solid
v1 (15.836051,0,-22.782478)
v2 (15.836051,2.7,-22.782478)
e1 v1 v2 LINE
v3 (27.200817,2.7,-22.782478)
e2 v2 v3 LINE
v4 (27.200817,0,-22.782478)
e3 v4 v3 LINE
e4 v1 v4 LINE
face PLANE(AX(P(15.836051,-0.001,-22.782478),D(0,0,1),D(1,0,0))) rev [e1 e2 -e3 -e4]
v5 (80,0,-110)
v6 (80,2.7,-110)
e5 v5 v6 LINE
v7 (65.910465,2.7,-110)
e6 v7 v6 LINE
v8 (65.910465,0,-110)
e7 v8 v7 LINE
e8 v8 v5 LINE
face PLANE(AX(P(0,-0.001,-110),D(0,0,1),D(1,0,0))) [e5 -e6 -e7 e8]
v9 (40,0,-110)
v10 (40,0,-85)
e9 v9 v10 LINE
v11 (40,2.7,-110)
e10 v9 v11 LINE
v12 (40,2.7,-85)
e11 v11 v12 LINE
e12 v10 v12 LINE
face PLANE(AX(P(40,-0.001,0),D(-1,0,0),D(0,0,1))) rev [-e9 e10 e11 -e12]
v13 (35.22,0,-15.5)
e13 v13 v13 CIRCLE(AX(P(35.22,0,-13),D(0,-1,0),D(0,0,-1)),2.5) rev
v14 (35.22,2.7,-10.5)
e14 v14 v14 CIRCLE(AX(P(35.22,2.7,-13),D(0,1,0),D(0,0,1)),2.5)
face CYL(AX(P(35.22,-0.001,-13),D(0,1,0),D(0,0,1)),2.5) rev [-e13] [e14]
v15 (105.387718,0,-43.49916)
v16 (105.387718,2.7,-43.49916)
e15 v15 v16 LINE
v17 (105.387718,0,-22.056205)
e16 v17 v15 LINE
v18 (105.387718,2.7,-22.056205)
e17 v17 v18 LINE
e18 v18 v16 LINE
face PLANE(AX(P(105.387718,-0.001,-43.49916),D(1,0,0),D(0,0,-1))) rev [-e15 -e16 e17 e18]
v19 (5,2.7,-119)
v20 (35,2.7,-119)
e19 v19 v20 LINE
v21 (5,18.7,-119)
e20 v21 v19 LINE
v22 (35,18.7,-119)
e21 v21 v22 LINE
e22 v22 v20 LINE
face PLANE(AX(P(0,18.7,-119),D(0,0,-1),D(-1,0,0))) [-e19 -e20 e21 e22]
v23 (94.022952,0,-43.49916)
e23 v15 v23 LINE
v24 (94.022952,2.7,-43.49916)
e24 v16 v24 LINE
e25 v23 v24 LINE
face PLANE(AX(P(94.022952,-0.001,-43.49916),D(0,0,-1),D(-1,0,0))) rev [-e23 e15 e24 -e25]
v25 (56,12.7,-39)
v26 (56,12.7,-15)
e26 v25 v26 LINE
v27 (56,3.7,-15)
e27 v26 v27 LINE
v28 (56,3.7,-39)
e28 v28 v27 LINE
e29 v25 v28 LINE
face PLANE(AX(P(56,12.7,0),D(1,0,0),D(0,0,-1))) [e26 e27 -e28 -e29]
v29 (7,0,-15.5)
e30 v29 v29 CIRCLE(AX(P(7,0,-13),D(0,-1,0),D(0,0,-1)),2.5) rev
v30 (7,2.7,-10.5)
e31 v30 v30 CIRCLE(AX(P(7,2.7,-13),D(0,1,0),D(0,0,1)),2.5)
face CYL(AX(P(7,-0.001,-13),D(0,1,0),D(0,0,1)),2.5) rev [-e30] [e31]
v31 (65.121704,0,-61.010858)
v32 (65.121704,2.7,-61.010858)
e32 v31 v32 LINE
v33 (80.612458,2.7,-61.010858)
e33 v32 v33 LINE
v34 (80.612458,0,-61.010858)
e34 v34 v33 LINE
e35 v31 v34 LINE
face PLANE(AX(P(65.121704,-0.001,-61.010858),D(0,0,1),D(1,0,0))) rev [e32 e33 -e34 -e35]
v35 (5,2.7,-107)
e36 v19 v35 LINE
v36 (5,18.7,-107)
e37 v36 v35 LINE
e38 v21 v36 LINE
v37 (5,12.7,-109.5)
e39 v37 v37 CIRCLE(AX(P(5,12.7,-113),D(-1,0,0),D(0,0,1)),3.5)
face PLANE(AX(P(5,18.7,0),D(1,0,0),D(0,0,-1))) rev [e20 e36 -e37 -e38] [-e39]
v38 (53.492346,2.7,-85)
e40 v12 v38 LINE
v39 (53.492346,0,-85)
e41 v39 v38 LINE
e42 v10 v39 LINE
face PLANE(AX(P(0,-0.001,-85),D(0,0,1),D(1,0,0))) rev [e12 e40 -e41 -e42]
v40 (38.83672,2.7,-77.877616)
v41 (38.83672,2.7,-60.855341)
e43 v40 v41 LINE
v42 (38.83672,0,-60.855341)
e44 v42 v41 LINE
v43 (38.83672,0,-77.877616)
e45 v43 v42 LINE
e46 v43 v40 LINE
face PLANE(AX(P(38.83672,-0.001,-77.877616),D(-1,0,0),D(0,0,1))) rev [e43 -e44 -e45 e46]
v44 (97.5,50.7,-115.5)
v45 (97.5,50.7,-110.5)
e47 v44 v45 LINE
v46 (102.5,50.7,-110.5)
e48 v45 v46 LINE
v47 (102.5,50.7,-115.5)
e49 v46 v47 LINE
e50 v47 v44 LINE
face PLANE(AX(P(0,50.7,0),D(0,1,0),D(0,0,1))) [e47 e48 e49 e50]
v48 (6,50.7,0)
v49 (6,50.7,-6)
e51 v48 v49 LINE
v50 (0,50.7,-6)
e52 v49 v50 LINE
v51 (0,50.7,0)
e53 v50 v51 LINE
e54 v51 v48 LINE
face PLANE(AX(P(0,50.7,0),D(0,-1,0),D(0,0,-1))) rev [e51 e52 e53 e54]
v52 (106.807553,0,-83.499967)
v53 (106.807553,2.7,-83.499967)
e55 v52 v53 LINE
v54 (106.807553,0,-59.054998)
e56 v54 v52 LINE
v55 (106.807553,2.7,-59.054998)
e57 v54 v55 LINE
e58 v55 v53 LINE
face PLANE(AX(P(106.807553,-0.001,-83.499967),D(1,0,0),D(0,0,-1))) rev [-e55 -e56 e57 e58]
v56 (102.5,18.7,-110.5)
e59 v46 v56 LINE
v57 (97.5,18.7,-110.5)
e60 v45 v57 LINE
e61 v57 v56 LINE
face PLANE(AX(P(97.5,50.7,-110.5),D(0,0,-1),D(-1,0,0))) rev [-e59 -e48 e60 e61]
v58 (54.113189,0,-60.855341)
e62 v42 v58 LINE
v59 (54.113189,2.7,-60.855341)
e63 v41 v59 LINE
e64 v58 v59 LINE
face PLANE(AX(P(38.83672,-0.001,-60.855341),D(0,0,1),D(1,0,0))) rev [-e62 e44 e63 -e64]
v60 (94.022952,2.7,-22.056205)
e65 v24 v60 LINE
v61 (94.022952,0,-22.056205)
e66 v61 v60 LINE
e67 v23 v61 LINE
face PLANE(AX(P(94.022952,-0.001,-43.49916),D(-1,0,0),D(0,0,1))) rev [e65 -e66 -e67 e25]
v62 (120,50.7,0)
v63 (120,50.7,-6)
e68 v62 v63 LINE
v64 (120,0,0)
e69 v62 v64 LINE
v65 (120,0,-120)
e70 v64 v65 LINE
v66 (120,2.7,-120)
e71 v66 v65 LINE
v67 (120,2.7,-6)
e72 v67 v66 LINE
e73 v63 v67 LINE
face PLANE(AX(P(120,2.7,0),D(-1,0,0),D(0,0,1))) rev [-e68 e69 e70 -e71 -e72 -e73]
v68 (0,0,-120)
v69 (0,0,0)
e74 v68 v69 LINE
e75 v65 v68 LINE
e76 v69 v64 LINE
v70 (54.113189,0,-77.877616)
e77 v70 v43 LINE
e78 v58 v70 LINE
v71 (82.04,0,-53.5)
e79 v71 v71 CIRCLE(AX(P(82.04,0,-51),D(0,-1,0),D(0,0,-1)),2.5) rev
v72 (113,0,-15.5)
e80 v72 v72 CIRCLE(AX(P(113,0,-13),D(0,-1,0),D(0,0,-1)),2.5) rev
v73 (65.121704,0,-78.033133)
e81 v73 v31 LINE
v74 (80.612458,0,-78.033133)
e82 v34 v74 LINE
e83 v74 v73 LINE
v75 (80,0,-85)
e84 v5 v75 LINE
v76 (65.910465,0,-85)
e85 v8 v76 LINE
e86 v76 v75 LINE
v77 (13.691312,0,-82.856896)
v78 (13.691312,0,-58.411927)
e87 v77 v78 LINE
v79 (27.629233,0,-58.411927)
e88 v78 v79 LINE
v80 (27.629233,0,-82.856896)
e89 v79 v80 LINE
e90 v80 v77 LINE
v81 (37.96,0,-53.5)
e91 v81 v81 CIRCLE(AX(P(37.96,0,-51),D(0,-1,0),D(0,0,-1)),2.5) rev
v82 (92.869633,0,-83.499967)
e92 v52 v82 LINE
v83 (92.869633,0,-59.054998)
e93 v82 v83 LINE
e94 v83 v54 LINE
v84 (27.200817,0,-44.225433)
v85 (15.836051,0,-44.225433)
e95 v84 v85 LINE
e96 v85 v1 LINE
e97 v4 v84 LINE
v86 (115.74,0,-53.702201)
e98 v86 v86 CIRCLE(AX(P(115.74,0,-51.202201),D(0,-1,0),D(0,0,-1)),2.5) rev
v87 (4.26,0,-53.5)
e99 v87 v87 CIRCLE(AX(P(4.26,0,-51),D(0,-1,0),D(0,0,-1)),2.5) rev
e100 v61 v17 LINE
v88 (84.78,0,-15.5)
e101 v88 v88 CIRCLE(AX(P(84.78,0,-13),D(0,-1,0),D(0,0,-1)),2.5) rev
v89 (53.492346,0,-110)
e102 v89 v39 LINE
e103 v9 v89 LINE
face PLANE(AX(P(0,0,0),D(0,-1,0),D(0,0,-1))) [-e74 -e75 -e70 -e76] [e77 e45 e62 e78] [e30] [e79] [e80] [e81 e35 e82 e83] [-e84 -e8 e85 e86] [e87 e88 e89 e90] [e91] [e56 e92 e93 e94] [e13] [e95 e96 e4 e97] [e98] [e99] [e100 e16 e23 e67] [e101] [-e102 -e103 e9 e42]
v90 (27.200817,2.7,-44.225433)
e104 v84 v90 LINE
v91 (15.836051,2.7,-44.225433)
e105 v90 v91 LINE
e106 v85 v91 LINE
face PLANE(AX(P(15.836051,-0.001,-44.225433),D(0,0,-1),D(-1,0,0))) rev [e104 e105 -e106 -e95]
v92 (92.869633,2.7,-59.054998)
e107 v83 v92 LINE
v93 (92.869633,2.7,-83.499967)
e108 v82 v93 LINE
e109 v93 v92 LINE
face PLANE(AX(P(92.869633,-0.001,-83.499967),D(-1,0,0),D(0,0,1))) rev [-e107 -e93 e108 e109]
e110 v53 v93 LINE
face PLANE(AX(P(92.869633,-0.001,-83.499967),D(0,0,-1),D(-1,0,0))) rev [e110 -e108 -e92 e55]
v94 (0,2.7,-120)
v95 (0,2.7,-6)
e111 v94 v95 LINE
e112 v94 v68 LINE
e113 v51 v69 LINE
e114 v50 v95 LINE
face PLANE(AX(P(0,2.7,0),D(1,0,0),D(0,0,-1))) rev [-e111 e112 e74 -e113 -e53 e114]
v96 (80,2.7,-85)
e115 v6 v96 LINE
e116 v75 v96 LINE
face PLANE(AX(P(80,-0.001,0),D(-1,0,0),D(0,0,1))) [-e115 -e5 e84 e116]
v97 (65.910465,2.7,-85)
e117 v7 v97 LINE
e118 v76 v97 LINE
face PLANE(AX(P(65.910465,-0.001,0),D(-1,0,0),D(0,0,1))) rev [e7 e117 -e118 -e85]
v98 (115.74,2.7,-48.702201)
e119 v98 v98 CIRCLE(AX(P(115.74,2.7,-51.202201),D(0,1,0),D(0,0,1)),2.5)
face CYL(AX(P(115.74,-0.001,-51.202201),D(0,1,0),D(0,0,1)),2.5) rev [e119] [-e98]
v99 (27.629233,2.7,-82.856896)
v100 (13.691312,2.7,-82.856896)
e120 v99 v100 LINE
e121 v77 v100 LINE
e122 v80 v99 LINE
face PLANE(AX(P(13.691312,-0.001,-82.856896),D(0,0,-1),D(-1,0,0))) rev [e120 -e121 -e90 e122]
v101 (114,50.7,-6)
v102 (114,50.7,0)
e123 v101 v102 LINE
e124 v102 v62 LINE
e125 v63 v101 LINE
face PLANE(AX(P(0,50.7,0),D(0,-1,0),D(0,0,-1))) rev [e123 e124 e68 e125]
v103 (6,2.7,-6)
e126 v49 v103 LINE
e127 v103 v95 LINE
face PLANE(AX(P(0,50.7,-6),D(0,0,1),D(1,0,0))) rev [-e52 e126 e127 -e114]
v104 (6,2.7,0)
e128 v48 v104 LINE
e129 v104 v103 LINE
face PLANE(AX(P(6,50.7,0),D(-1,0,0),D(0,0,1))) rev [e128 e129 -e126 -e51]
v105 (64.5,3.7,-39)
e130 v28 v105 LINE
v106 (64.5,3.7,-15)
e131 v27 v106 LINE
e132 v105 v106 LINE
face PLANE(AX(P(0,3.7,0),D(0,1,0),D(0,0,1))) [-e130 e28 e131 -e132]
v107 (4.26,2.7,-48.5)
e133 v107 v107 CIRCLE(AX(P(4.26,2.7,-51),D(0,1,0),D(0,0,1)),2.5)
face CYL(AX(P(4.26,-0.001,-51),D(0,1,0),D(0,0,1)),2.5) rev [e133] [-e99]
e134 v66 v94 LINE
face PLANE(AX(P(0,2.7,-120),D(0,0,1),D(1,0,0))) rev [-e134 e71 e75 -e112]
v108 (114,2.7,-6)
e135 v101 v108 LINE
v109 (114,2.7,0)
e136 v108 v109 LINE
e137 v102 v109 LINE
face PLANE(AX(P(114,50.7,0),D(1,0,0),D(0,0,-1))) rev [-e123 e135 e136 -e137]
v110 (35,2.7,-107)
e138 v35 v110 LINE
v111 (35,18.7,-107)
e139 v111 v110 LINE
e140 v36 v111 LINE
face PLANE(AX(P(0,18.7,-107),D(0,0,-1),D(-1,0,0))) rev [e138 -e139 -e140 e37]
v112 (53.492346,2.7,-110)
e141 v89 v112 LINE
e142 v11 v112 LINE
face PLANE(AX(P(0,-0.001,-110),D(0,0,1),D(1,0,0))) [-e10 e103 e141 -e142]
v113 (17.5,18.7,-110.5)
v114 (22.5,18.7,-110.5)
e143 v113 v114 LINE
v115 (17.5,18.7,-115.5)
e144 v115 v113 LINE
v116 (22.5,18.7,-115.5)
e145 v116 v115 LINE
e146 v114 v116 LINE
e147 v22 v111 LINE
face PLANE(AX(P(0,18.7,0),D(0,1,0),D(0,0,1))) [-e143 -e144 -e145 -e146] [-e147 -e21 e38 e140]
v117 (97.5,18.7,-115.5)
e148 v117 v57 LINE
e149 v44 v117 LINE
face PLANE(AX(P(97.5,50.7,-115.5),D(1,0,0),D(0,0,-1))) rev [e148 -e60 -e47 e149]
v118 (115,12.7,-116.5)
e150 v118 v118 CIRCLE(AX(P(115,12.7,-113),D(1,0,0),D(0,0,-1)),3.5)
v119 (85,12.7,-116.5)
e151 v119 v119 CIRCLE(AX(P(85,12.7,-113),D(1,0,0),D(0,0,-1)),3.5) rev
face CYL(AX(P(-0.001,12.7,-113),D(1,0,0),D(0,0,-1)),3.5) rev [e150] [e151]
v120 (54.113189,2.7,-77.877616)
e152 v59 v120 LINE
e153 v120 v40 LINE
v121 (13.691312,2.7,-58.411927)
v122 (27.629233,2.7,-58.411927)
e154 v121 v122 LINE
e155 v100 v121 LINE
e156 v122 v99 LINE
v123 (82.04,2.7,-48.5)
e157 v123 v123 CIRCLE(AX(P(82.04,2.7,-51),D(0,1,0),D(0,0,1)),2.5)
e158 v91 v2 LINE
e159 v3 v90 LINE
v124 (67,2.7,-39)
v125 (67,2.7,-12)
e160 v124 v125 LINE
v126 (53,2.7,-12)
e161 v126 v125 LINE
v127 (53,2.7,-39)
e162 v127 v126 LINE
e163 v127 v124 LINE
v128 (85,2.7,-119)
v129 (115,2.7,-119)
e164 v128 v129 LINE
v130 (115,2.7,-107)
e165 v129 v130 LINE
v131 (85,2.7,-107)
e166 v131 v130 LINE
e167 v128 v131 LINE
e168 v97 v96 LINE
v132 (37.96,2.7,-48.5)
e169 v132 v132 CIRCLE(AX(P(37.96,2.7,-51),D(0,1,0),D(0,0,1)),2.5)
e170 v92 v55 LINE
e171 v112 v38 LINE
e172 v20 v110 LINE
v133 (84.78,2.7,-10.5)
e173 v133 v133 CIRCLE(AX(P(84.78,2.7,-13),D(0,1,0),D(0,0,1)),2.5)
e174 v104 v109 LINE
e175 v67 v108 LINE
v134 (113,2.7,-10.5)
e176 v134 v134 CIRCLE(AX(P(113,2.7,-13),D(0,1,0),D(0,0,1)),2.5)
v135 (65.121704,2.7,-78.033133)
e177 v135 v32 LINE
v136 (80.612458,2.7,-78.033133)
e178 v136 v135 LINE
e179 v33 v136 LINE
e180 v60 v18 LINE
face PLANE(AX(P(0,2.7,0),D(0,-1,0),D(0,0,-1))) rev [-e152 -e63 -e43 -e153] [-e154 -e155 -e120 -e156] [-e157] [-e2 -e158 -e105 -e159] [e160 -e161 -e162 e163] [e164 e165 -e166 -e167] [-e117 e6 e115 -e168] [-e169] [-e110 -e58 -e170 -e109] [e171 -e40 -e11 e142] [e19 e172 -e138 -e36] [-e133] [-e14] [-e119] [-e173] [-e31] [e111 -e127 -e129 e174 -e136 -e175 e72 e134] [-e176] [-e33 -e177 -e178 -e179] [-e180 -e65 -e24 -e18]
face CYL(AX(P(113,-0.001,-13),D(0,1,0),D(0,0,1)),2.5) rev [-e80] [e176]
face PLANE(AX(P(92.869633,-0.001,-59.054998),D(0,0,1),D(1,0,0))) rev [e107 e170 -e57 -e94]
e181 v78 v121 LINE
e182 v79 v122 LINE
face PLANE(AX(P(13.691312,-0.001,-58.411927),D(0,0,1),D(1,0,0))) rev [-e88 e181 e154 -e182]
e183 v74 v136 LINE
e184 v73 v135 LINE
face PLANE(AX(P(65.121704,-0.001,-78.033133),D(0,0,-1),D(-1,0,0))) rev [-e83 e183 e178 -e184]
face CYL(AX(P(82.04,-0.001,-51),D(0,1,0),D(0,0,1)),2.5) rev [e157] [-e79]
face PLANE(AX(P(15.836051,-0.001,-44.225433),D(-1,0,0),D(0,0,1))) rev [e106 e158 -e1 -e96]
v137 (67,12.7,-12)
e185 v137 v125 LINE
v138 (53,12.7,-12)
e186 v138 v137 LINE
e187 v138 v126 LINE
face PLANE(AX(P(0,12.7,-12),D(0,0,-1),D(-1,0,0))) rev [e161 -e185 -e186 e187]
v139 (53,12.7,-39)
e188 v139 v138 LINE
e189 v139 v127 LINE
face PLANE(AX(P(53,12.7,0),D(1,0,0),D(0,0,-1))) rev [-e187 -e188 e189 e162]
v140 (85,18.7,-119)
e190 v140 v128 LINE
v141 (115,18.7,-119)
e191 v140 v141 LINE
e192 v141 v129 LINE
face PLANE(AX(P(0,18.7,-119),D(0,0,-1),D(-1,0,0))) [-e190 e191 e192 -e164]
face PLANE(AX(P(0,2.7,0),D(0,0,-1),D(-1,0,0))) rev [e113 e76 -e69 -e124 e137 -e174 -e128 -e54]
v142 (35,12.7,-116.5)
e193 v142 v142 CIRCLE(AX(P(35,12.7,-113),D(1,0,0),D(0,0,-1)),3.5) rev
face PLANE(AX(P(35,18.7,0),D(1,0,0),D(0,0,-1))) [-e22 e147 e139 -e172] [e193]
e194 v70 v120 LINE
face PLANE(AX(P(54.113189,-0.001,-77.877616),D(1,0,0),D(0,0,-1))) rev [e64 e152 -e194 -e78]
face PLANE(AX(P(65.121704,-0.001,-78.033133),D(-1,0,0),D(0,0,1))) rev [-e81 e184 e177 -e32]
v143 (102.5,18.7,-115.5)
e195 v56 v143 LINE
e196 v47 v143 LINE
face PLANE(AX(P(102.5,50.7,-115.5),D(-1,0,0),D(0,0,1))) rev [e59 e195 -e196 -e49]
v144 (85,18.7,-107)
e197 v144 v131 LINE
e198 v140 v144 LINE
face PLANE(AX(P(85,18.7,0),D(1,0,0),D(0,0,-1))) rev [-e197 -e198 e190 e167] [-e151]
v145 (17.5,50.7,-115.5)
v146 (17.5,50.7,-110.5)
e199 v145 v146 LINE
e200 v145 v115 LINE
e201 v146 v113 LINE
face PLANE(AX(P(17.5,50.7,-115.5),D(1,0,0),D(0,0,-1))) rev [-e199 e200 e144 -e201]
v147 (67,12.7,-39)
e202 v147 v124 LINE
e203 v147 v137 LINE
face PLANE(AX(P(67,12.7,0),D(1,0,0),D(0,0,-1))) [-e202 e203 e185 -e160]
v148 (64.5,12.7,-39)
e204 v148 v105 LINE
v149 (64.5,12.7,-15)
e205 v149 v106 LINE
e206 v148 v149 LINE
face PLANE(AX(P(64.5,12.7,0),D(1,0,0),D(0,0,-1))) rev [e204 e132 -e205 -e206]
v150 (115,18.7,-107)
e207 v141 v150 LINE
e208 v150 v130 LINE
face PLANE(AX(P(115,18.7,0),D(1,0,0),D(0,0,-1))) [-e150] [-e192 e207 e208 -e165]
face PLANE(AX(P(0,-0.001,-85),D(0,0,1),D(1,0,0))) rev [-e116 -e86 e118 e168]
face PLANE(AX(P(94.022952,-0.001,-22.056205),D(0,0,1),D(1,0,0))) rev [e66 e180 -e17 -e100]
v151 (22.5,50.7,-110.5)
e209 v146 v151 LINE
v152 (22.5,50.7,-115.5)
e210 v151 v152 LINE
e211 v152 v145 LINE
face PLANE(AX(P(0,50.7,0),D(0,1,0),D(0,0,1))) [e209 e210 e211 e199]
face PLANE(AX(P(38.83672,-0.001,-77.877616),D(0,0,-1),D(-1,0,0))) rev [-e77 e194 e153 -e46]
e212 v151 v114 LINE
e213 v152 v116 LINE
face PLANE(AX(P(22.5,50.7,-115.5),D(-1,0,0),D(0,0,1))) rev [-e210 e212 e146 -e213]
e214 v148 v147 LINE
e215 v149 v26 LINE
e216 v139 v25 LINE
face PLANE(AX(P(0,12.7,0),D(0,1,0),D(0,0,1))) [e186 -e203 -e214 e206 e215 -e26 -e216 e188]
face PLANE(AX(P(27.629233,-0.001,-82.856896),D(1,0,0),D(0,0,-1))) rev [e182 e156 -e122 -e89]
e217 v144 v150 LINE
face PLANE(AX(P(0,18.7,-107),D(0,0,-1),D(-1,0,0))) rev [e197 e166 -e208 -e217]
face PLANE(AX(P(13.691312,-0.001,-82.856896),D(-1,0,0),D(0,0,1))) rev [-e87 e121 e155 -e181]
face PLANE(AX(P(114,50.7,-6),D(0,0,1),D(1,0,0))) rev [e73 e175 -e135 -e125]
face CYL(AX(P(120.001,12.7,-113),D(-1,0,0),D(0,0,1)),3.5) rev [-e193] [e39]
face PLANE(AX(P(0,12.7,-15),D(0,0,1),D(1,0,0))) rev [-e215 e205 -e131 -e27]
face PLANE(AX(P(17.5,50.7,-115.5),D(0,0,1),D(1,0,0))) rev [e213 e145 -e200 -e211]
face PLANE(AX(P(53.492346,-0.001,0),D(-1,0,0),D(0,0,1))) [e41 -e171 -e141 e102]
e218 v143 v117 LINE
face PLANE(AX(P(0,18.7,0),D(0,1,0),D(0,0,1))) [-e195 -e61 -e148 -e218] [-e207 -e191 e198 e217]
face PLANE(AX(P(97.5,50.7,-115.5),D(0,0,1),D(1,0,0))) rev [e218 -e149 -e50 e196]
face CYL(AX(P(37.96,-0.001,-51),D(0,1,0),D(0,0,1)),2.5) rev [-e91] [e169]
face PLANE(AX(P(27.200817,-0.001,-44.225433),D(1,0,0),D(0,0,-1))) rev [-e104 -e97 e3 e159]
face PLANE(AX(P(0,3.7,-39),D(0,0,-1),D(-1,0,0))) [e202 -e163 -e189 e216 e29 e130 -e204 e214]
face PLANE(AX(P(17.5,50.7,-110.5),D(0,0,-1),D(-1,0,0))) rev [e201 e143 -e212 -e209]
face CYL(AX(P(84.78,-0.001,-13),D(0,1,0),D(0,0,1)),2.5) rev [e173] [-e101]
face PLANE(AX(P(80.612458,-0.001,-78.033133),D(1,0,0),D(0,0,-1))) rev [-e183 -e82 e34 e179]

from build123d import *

# Parameters (mm, degrees)
SKETCH1_W                 = 120
SKETCH1_H                 = 120
BOSS_EXTRUDE1_DEPTH       = 2.7
CUT_EXTRUDE1_REACH        = 171.727
SKETCH2_W                 = 13.492346384
SKETCH2_H                 = 25
SKETCH2_W_2               = 14.089535058
SKETCH2_3_W               = 30
SKETCH2_3_H               = 12
BOSS_EXTRUDE2_DEPTH       = 16
CUT_EXTRUDE2_REACH        = 169.256
SKETCH4_R                 = 3.5
CUT_EXTRUDE3_REACH        = 169.256
SKETCH5_R                 = 3.5
CUT_EXTRUDE4_REACH        = 172.458
SKETCH6_R                 = 2.5
BOSS_EXTRUDE4_START       = 56
BOSS_EXTRUDE4_OUTLINE_W   = 1
BOSS_EXTRUDE4_OUTLINE_H   = 24
BOSS_EXTRUDE4_DEPTH       = 8.5
BOSS_EXTRUDE5_START       = -39
BOSS_EXTRUDE5_OUTLINE_W   = 2.5
BOSS_EXTRUDE5_OUTLINE_H   = 10
BOSS_EXTRUDE5_OUTLINE_W_2 = 3
BOSS_EXTRUDE5_DEPTH       = 27
BOSS_EXTRUDE5_START_2     = -15
BOSS_EXTRUDE5_2_OUTLINE_W = 8.5
BOSS_EXTRUDE5_2_OUTLINE_H = 10
BOSS_EXTRUDE5_2_DEPTH     = 3
CUT_EXTRUDE5_REACH        = 172.458
SKETCH8_W                 = 13.93792073
SKETCH8_H                 = 24.444968664
SKETCH8_W_2               = 11.364766133
SKETCH8_H_2               = 21.442954969
SKETCH8_W_3               = 15.276468839
SKETCH8_H_3               = 17.022275105
SKETCH8_H_4               = 21.442954968
SKETCH8_W_4               = 15.490753693
SKETCH9_W                 = 5
SKETCH9_H                 = 5
BOSS_EXTRUDE6_DEPTH       = 32
SKETCH10_W                = 6
SKETCH10_H                = 6
BOSS_EXTRUDE7_DEPTH       = 48


# Read off the part's stored shape, not the designer's step: Boss-Extrude4, Boss-Extrude5
with BuildPart() as part:
    # Sketch1 → Boss-Extrude1 (new body)
    with BuildSketch(Plane(origin=(0, 0, 0), x_dir=(1, 0, 0), z_dir=(0, 1, 0))):
        with Locations((60, 60)):
            Rectangle(SKETCH1_W, SKETCH1_H)
    extrude(amount=BOSS_EXTRUDE1_DEPTH)

    # Sketch2 → Cut-Extrude1 (cut, up to next)
    with BuildSketch(Plane(origin=(0, 2.7, 0), x_dir=(1, 0, 0), z_dir=(0, 1, 0)), mode=Mode.PRIVATE) as cut_extrude1_sk1:
        with Locations((46.746173192, 97.5)):
            Rectangle(SKETCH2_W, SKETCH2_H)
    cut_extrude1_tool1 = extrude(cut_extrude1_sk1.sketch, amount=-CUT_EXTRUDE1_REACH, mode=Mode.PRIVATE) & part.part
    # Sketch2 → Cut-Extrude1 (cut, up to next)
    with BuildSketch(Plane(origin=(0, 2.7, 0), x_dir=(1, 0, 0), z_dir=(0, 1, 0)), mode=Mode.PRIVATE) as cut_extrude1_sk2:
        with Locations((72.955232471, 97.5)):
            Rectangle(SKETCH2_W_2, SKETCH2_H)
    cut_extrude1_tool2 = extrude(cut_extrude1_sk2.sketch, amount=-CUT_EXTRUDE1_REACH, mode=Mode.PRIVATE) & part.part
    add(cut_extrude1_tool1.solids().sort_by_distance((46.746173, 2.7, -97.5))[0], mode=Mode.SUBTRACT)
    add(cut_extrude1_tool2.solids().sort_by_distance((72.955232, 2.7, -97.5))[0], mode=Mode.SUBTRACT)

    # Sketch2<3> → Boss-Extrude2 (add)
    with BuildSketch(Plane(origin=(0, 2.7, 0), x_dir=(1, 0, 0), z_dir=(0, 1, 0))):
        with Locations((20, 113)):
            Rectangle(SKETCH2_3_W, SKETCH2_3_H)
        with Locations((100, 113)):
            Rectangle(SKETCH2_3_W, SKETCH2_3_H)
    extrude(amount=BOSS_EXTRUDE2_DEPTH)

    # Sketch4 → Cut-Extrude2 (cut, up to next)
    with BuildSketch(Plane.ZY.offset(-5), mode=Mode.PRIVATE) as cut_extrude2_sk1:
        with Locations((-113, 12.7)):
            Circle(SKETCH4_R)
    cut_extrude2_tool1 = extrude(cut_extrude2_sk1.sketch, amount=-CUT_EXTRUDE2_REACH, mode=Mode.PRIVATE) & part.part
    add(cut_extrude2_tool1.solids().sort_by_distance((5, 12.7, -113))[0], mode=Mode.SUBTRACT)

    # Sketch5 → Cut-Extrude3 (cut, up to next)
    with BuildSketch(Plane(origin=(115, 0, 0), x_dir=(0, 0, -1), z_dir=(1, 0, 0)), mode=Mode.PRIVATE) as cut_extrude3_sk1:
        with Locations(Location((113, 12.7, 0), (0, 0, 180))):
            Circle(SKETCH5_R)
    cut_extrude3_tool1 = extrude(cut_extrude3_sk1.sketch, amount=-CUT_EXTRUDE3_REACH, mode=Mode.PRIVATE) & part.part
    add(cut_extrude3_tool1.solids().sort_by_distance((115, 12.7, -113))[0], mode=Mode.SUBTRACT)

    # Sketch6 → Cut-Extrude4 (cut, up to next)
    with BuildSketch(Plane(origin=(0, 2.7, 0), x_dir=(1, 0, 0), z_dir=(0, 1, 0)), mode=Mode.PRIVATE) as cut_extrude4_sk1:
        with Locations(Location((7, 13, 0), (0, 0, 270))):
            Circle(SKETCH6_R)
    cut_extrude4_tool1 = extrude(cut_extrude4_sk1.sketch, amount=-CUT_EXTRUDE4_REACH, mode=Mode.PRIVATE) & part.part
    # Sketch6 → Cut-Extrude4 (cut, up to next)
    with BuildSketch(Plane(origin=(0, 2.7, 0), x_dir=(1, 0, 0), z_dir=(0, 1, 0)), mode=Mode.PRIVATE) as cut_extrude4_sk2:
        with Locations(Location((4.26, 51, 0), (0, 0, 270))):
            Circle(SKETCH6_R)
    cut_extrude4_tool2 = extrude(cut_extrude4_sk2.sketch, amount=-CUT_EXTRUDE4_REACH, mode=Mode.PRIVATE) & part.part
    # Sketch6 → Cut-Extrude4 (cut, up to next)
    with BuildSketch(Plane(origin=(0, 2.7, 0), x_dir=(1, 0, 0), z_dir=(0, 1, 0)), mode=Mode.PRIVATE) as cut_extrude4_sk3:
        with Locations(Location((37.96, 51, 0), (0, 0, 270))):
            Circle(SKETCH6_R)
    cut_extrude4_tool3 = extrude(cut_extrude4_sk3.sketch, amount=-CUT_EXTRUDE4_REACH, mode=Mode.PRIVATE) & part.part
    # Sketch6 → Cut-Extrude4 (cut, up to next)
    with BuildSketch(Plane(origin=(0, 2.7, 0), x_dir=(1, 0, 0), z_dir=(0, 1, 0)), mode=Mode.PRIVATE) as cut_extrude4_sk4:
        with Locations(Location((84.78, 13, 0), (0, 0, 270))):
            Circle(SKETCH6_R)
    cut_extrude4_tool4 = extrude(cut_extrude4_sk4.sketch, amount=-CUT_EXTRUDE4_REACH, mode=Mode.PRIVATE) & part.part
    # Sketch6 → Cut-Extrude4 (cut, up to next)
    with BuildSketch(Plane(origin=(0, 2.7, 0), x_dir=(1, 0, 0), z_dir=(0, 1, 0)), mode=Mode.PRIVATE) as cut_extrude4_sk5:
        with Locations(Location((82.04, 51, 0), (0, 0, 270))):
            Circle(SKETCH6_R)
    cut_extrude4_tool5 = extrude(cut_extrude4_sk5.sketch, amount=-CUT_EXTRUDE4_REACH, mode=Mode.PRIVATE) & part.part
    # Sketch6 → Cut-Extrude4 (cut, up to next)
    with BuildSketch(Plane(origin=(0, 2.7, 0), x_dir=(1, 0, 0), z_dir=(0, 1, 0)), mode=Mode.PRIVATE) as cut_extrude4_sk6:
        with Locations(Location((115.74, 51.20220141, 0), (0, 0, 270))):
            Circle(SKETCH6_R)
    cut_extrude4_tool6 = extrude(cut_extrude4_sk6.sketch, amount=-CUT_EXTRUDE4_REACH, mode=Mode.PRIVATE) & part.part
    # Sketch6 → Cut-Extrude4 (cut, up to next)
    with BuildSketch(Plane(origin=(0, 2.7, 0), x_dir=(1, 0, 0), z_dir=(0, 1, 0)), mode=Mode.PRIVATE) as cut_extrude4_sk7:
        with Locations(Location((113, 13, 0), (0, 0, 270))):
            Circle(SKETCH6_R)
    cut_extrude4_tool7 = extrude(cut_extrude4_sk7.sketch, amount=-CUT_EXTRUDE4_REACH, mode=Mode.PRIVATE) & part.part
    # Sketch6 → Cut-Extrude4 (cut, up to next)
    with BuildSketch(Plane(origin=(0, 2.7, 0), x_dir=(1, 0, 0), z_dir=(0, 1, 0)), mode=Mode.PRIVATE) as cut_extrude4_sk8:
        with Locations(Location((35.22, 13, 0), (0, 0, 270))):
            Circle(SKETCH6_R)
    cut_extrude4_tool8 = extrude(cut_extrude4_sk8.sketch, amount=-CUT_EXTRUDE4_REACH, mode=Mode.PRIVATE) & part.part
    add(cut_extrude4_tool1.solids().sort_by_distance((7, 2.7, -13))[0], mode=Mode.SUBTRACT)
    add(cut_extrude4_tool2.solids().sort_by_distance((4.26, 2.7, -51))[0], mode=Mode.SUBTRACT)
    add(cut_extrude4_tool3.solids().sort_by_distance((37.96, 2.7, -51))[0], mode=Mode.SUBTRACT)
    add(cut_extrude4_tool4.solids().sort_by_distance((84.78, 2.7, -13))[0], mode=Mode.SUBTRACT)
    add(cut_extrude4_tool5.solids().sort_by_distance((82.04, 2.7, -51))[0], mode=Mode.SUBTRACT)
    add(cut_extrude4_tool6.solids().sort_by_distance((115.74, 2.7, -51.202201))[0], mode=Mode.SUBTRACT)
    add(cut_extrude4_tool7.solids().sort_by_distance((113, 2.7, -13))[0], mode=Mode.SUBTRACT)
    add(cut_extrude4_tool8.solids().sort_by_distance((35.22, 2.7, -13))[0], mode=Mode.SUBTRACT)

    # Boss-Extrude4 outline → Boss-Extrude4 (add)
    with BuildSketch(Plane.YZ.offset(BOSS_EXTRUDE4_START)):
        with Locations((3.2, -27)):
            Rectangle(BOSS_EXTRUDE4_OUTLINE_W, BOSS_EXTRUDE4_OUTLINE_H)
    extrude(amount=BOSS_EXTRUDE4_DEPTH)

    # Boss-Extrude5 outline → Boss-Extrude5 (add)
    with BuildSketch(Plane.XY.offset(BOSS_EXTRUDE5_START)):
        with Locations((65.75, 7.7)):
            Rectangle(BOSS_EXTRUDE5_OUTLINE_W, BOSS_EXTRUDE5_OUTLINE_H)
        with Locations((54.5, 7.7)):
            Rectangle(BOSS_EXTRUDE5_OUTLINE_W_2, BOSS_EXTRUDE5_OUTLINE_H)
    extrude(amount=BOSS_EXTRUDE5_DEPTH)

    # Boss-Extrude5 2 outline → Boss-Extrude5 2 (add)
    with BuildSketch(Plane.XY.offset(BOSS_EXTRUDE5_START_2)):
        with Locations((60.25, 7.7)):
            Rectangle(BOSS_EXTRUDE5_2_OUTLINE_W, BOSS_EXTRUDE5_2_OUTLINE_H)
    extrude(amount=BOSS_EXTRUDE5_2_DEPTH)

    # Sketch8 → Cut-Extrude5 (cut, up to next)
    with BuildSketch(Plane(origin=(0, 2.7, 0), x_dir=(1, 0, 0), z_dir=(0, 1, 0)), mode=Mode.PRIVATE) as cut_extrude5_sk1:
        with Locations((99.838592928, 71.277482239)):
            Rectangle(SKETCH8_W, SKETCH8_H)
    cut_extrude5_tool1 = extrude(cut_extrude5_sk1.sketch, amount=-CUT_EXTRUDE5_REACH, mode=Mode.PRIVATE) & part.part
    # Sketch8 → Cut-Extrude5 (cut, up to next)
    with BuildSketch(Plane(origin=(0, 2.7, 0), x_dir=(1, 0, 0), z_dir=(0, 1, 0)), mode=Mode.PRIVATE) as cut_extrude5_sk2:
        with Locations((21.518433658, 33.503955022)):
            Rectangle(SKETCH8_W_2, SKETCH8_H_2)
    cut_extrude5_tool2 = extrude(cut_extrude5_sk2.sketch, amount=-CUT_EXTRUDE5_REACH, mode=Mode.PRIVATE) & part.part
    # Sketch8 → Cut-Extrude5 (cut, up to next)
    with BuildSketch(Plane(origin=(0, 2.7, 0), x_dir=(1, 0, 0), z_dir=(0, 1, 0)), mode=Mode.PRIVATE) as cut_extrude5_sk3:
        with Locations((20.660272656, 70.634411505)):
            Rectangle(SKETCH8_W, SKETCH8_H)
    cut_extrude5_tool3 = extrude(cut_extrude5_sk3.sketch, amount=-CUT_EXTRUDE5_REACH, mode=Mode.PRIVATE) & part.part
    # Sketch8 → Cut-Extrude5 (cut, up to next)
    with BuildSketch(Plane(origin=(0, 2.7, 0), x_dir=(1, 0, 0), z_dir=(0, 1, 0)), mode=Mode.PRIVATE) as cut_extrude5_sk4:
        with Locations((46.474954565, 69.366478605)):
            Rectangle(SKETCH8_W_3, SKETCH8_H_3)
    cut_extrude5_tool4 = extrude(cut_extrude5_sk4.sketch, amount=-CUT_EXTRUDE5_REACH, mode=Mode.PRIVATE) & part.part
    # Sketch8 → Cut-Extrude5 (cut, up to next)
    with BuildSketch(Plane(origin=(0, 2.7, 0), x_dir=(1, 0, 0), z_dir=(0, 1, 0)), mode=Mode.PRIVATE) as cut_extrude5_sk5:
        with Locations((99.705334599, 32.777682609)):
            Rectangle(SKETCH8_W_2, SKETCH8_H_4)
    cut_extrude5_tool5 = extrude(cut_extrude5_sk5.sketch, amount=-CUT_EXTRUDE5_REACH, mode=Mode.PRIVATE) & part.part
    # Sketch8 → Cut-Extrude5 (cut, up to next)
    with BuildSketch(Plane(origin=(0, 2.7, 0), x_dir=(1, 0, 0), z_dir=(0, 1, 0)), mode=Mode.PRIVATE) as cut_extrude5_sk6:
        with Locations((72.867080872, 69.52199516)):
            Rectangle(SKETCH8_W_4, SKETCH8_H_3)
    cut_extrude5_tool6 = extrude(cut_extrude5_sk6.sketch, amount=-CUT_EXTRUDE5_REACH, mode=Mode.PRIVATE) & part.part
    add(cut_extrude5_tool1.solids().sort_by_distance((99.838593, 2.7, -71.277482))[0], mode=Mode.SUBTRACT)
    add(cut_extrude5_tool2.solids().sort_by_distance((21.518434, 2.7, -33.503955))[0], mode=Mode.SUBTRACT)
    add(cut_extrude5_tool3.solids().sort_by_distance((20.660273, 2.7, -70.634412))[0], mode=Mode.SUBTRACT)
    add(cut_extrude5_tool4.solids().sort_by_distance((46.474955, 2.7, -69.366479))[0], mode=Mode.SUBTRACT)
    add(cut_extrude5_tool5.solids().sort_by_distance((99.705335, 2.7, -32.777683))[0], mode=Mode.SUBTRACT)
    add(cut_extrude5_tool6.solids().sort_by_distance((72.867081, 2.7, -69.521995))[0], mode=Mode.SUBTRACT)

    # Sketch9 → Boss-Extrude6 (add)
    with BuildSketch(Plane(origin=(0, 18.7, 0), x_dir=(1, 0, 0), z_dir=(0, 1, 0))):
        with Locations((20, 113)):
            Rectangle(SKETCH9_W, SKETCH9_H)
        with Locations((100, 113)):
            Rectangle(SKETCH9_W, SKETCH9_H)
    extrude(amount=BOSS_EXTRUDE6_DEPTH)

    # Sketch10 → Boss-Extrude7 (add)
    with BuildSketch(Plane(origin=(0, 2.7, 0), x_dir=(1, 0, 0), z_dir=(0, 1, 0))):
        with Locations((117, 3)):
            Rectangle(SKETCH10_W, SKETCH10_H)
        with Locations((3, 3)):
            Rectangle(SKETCH10_W, SKETCH10_H)
    extrude(amount=BOSS_EXTRUDE7_DEPTH)


solid = part.part
